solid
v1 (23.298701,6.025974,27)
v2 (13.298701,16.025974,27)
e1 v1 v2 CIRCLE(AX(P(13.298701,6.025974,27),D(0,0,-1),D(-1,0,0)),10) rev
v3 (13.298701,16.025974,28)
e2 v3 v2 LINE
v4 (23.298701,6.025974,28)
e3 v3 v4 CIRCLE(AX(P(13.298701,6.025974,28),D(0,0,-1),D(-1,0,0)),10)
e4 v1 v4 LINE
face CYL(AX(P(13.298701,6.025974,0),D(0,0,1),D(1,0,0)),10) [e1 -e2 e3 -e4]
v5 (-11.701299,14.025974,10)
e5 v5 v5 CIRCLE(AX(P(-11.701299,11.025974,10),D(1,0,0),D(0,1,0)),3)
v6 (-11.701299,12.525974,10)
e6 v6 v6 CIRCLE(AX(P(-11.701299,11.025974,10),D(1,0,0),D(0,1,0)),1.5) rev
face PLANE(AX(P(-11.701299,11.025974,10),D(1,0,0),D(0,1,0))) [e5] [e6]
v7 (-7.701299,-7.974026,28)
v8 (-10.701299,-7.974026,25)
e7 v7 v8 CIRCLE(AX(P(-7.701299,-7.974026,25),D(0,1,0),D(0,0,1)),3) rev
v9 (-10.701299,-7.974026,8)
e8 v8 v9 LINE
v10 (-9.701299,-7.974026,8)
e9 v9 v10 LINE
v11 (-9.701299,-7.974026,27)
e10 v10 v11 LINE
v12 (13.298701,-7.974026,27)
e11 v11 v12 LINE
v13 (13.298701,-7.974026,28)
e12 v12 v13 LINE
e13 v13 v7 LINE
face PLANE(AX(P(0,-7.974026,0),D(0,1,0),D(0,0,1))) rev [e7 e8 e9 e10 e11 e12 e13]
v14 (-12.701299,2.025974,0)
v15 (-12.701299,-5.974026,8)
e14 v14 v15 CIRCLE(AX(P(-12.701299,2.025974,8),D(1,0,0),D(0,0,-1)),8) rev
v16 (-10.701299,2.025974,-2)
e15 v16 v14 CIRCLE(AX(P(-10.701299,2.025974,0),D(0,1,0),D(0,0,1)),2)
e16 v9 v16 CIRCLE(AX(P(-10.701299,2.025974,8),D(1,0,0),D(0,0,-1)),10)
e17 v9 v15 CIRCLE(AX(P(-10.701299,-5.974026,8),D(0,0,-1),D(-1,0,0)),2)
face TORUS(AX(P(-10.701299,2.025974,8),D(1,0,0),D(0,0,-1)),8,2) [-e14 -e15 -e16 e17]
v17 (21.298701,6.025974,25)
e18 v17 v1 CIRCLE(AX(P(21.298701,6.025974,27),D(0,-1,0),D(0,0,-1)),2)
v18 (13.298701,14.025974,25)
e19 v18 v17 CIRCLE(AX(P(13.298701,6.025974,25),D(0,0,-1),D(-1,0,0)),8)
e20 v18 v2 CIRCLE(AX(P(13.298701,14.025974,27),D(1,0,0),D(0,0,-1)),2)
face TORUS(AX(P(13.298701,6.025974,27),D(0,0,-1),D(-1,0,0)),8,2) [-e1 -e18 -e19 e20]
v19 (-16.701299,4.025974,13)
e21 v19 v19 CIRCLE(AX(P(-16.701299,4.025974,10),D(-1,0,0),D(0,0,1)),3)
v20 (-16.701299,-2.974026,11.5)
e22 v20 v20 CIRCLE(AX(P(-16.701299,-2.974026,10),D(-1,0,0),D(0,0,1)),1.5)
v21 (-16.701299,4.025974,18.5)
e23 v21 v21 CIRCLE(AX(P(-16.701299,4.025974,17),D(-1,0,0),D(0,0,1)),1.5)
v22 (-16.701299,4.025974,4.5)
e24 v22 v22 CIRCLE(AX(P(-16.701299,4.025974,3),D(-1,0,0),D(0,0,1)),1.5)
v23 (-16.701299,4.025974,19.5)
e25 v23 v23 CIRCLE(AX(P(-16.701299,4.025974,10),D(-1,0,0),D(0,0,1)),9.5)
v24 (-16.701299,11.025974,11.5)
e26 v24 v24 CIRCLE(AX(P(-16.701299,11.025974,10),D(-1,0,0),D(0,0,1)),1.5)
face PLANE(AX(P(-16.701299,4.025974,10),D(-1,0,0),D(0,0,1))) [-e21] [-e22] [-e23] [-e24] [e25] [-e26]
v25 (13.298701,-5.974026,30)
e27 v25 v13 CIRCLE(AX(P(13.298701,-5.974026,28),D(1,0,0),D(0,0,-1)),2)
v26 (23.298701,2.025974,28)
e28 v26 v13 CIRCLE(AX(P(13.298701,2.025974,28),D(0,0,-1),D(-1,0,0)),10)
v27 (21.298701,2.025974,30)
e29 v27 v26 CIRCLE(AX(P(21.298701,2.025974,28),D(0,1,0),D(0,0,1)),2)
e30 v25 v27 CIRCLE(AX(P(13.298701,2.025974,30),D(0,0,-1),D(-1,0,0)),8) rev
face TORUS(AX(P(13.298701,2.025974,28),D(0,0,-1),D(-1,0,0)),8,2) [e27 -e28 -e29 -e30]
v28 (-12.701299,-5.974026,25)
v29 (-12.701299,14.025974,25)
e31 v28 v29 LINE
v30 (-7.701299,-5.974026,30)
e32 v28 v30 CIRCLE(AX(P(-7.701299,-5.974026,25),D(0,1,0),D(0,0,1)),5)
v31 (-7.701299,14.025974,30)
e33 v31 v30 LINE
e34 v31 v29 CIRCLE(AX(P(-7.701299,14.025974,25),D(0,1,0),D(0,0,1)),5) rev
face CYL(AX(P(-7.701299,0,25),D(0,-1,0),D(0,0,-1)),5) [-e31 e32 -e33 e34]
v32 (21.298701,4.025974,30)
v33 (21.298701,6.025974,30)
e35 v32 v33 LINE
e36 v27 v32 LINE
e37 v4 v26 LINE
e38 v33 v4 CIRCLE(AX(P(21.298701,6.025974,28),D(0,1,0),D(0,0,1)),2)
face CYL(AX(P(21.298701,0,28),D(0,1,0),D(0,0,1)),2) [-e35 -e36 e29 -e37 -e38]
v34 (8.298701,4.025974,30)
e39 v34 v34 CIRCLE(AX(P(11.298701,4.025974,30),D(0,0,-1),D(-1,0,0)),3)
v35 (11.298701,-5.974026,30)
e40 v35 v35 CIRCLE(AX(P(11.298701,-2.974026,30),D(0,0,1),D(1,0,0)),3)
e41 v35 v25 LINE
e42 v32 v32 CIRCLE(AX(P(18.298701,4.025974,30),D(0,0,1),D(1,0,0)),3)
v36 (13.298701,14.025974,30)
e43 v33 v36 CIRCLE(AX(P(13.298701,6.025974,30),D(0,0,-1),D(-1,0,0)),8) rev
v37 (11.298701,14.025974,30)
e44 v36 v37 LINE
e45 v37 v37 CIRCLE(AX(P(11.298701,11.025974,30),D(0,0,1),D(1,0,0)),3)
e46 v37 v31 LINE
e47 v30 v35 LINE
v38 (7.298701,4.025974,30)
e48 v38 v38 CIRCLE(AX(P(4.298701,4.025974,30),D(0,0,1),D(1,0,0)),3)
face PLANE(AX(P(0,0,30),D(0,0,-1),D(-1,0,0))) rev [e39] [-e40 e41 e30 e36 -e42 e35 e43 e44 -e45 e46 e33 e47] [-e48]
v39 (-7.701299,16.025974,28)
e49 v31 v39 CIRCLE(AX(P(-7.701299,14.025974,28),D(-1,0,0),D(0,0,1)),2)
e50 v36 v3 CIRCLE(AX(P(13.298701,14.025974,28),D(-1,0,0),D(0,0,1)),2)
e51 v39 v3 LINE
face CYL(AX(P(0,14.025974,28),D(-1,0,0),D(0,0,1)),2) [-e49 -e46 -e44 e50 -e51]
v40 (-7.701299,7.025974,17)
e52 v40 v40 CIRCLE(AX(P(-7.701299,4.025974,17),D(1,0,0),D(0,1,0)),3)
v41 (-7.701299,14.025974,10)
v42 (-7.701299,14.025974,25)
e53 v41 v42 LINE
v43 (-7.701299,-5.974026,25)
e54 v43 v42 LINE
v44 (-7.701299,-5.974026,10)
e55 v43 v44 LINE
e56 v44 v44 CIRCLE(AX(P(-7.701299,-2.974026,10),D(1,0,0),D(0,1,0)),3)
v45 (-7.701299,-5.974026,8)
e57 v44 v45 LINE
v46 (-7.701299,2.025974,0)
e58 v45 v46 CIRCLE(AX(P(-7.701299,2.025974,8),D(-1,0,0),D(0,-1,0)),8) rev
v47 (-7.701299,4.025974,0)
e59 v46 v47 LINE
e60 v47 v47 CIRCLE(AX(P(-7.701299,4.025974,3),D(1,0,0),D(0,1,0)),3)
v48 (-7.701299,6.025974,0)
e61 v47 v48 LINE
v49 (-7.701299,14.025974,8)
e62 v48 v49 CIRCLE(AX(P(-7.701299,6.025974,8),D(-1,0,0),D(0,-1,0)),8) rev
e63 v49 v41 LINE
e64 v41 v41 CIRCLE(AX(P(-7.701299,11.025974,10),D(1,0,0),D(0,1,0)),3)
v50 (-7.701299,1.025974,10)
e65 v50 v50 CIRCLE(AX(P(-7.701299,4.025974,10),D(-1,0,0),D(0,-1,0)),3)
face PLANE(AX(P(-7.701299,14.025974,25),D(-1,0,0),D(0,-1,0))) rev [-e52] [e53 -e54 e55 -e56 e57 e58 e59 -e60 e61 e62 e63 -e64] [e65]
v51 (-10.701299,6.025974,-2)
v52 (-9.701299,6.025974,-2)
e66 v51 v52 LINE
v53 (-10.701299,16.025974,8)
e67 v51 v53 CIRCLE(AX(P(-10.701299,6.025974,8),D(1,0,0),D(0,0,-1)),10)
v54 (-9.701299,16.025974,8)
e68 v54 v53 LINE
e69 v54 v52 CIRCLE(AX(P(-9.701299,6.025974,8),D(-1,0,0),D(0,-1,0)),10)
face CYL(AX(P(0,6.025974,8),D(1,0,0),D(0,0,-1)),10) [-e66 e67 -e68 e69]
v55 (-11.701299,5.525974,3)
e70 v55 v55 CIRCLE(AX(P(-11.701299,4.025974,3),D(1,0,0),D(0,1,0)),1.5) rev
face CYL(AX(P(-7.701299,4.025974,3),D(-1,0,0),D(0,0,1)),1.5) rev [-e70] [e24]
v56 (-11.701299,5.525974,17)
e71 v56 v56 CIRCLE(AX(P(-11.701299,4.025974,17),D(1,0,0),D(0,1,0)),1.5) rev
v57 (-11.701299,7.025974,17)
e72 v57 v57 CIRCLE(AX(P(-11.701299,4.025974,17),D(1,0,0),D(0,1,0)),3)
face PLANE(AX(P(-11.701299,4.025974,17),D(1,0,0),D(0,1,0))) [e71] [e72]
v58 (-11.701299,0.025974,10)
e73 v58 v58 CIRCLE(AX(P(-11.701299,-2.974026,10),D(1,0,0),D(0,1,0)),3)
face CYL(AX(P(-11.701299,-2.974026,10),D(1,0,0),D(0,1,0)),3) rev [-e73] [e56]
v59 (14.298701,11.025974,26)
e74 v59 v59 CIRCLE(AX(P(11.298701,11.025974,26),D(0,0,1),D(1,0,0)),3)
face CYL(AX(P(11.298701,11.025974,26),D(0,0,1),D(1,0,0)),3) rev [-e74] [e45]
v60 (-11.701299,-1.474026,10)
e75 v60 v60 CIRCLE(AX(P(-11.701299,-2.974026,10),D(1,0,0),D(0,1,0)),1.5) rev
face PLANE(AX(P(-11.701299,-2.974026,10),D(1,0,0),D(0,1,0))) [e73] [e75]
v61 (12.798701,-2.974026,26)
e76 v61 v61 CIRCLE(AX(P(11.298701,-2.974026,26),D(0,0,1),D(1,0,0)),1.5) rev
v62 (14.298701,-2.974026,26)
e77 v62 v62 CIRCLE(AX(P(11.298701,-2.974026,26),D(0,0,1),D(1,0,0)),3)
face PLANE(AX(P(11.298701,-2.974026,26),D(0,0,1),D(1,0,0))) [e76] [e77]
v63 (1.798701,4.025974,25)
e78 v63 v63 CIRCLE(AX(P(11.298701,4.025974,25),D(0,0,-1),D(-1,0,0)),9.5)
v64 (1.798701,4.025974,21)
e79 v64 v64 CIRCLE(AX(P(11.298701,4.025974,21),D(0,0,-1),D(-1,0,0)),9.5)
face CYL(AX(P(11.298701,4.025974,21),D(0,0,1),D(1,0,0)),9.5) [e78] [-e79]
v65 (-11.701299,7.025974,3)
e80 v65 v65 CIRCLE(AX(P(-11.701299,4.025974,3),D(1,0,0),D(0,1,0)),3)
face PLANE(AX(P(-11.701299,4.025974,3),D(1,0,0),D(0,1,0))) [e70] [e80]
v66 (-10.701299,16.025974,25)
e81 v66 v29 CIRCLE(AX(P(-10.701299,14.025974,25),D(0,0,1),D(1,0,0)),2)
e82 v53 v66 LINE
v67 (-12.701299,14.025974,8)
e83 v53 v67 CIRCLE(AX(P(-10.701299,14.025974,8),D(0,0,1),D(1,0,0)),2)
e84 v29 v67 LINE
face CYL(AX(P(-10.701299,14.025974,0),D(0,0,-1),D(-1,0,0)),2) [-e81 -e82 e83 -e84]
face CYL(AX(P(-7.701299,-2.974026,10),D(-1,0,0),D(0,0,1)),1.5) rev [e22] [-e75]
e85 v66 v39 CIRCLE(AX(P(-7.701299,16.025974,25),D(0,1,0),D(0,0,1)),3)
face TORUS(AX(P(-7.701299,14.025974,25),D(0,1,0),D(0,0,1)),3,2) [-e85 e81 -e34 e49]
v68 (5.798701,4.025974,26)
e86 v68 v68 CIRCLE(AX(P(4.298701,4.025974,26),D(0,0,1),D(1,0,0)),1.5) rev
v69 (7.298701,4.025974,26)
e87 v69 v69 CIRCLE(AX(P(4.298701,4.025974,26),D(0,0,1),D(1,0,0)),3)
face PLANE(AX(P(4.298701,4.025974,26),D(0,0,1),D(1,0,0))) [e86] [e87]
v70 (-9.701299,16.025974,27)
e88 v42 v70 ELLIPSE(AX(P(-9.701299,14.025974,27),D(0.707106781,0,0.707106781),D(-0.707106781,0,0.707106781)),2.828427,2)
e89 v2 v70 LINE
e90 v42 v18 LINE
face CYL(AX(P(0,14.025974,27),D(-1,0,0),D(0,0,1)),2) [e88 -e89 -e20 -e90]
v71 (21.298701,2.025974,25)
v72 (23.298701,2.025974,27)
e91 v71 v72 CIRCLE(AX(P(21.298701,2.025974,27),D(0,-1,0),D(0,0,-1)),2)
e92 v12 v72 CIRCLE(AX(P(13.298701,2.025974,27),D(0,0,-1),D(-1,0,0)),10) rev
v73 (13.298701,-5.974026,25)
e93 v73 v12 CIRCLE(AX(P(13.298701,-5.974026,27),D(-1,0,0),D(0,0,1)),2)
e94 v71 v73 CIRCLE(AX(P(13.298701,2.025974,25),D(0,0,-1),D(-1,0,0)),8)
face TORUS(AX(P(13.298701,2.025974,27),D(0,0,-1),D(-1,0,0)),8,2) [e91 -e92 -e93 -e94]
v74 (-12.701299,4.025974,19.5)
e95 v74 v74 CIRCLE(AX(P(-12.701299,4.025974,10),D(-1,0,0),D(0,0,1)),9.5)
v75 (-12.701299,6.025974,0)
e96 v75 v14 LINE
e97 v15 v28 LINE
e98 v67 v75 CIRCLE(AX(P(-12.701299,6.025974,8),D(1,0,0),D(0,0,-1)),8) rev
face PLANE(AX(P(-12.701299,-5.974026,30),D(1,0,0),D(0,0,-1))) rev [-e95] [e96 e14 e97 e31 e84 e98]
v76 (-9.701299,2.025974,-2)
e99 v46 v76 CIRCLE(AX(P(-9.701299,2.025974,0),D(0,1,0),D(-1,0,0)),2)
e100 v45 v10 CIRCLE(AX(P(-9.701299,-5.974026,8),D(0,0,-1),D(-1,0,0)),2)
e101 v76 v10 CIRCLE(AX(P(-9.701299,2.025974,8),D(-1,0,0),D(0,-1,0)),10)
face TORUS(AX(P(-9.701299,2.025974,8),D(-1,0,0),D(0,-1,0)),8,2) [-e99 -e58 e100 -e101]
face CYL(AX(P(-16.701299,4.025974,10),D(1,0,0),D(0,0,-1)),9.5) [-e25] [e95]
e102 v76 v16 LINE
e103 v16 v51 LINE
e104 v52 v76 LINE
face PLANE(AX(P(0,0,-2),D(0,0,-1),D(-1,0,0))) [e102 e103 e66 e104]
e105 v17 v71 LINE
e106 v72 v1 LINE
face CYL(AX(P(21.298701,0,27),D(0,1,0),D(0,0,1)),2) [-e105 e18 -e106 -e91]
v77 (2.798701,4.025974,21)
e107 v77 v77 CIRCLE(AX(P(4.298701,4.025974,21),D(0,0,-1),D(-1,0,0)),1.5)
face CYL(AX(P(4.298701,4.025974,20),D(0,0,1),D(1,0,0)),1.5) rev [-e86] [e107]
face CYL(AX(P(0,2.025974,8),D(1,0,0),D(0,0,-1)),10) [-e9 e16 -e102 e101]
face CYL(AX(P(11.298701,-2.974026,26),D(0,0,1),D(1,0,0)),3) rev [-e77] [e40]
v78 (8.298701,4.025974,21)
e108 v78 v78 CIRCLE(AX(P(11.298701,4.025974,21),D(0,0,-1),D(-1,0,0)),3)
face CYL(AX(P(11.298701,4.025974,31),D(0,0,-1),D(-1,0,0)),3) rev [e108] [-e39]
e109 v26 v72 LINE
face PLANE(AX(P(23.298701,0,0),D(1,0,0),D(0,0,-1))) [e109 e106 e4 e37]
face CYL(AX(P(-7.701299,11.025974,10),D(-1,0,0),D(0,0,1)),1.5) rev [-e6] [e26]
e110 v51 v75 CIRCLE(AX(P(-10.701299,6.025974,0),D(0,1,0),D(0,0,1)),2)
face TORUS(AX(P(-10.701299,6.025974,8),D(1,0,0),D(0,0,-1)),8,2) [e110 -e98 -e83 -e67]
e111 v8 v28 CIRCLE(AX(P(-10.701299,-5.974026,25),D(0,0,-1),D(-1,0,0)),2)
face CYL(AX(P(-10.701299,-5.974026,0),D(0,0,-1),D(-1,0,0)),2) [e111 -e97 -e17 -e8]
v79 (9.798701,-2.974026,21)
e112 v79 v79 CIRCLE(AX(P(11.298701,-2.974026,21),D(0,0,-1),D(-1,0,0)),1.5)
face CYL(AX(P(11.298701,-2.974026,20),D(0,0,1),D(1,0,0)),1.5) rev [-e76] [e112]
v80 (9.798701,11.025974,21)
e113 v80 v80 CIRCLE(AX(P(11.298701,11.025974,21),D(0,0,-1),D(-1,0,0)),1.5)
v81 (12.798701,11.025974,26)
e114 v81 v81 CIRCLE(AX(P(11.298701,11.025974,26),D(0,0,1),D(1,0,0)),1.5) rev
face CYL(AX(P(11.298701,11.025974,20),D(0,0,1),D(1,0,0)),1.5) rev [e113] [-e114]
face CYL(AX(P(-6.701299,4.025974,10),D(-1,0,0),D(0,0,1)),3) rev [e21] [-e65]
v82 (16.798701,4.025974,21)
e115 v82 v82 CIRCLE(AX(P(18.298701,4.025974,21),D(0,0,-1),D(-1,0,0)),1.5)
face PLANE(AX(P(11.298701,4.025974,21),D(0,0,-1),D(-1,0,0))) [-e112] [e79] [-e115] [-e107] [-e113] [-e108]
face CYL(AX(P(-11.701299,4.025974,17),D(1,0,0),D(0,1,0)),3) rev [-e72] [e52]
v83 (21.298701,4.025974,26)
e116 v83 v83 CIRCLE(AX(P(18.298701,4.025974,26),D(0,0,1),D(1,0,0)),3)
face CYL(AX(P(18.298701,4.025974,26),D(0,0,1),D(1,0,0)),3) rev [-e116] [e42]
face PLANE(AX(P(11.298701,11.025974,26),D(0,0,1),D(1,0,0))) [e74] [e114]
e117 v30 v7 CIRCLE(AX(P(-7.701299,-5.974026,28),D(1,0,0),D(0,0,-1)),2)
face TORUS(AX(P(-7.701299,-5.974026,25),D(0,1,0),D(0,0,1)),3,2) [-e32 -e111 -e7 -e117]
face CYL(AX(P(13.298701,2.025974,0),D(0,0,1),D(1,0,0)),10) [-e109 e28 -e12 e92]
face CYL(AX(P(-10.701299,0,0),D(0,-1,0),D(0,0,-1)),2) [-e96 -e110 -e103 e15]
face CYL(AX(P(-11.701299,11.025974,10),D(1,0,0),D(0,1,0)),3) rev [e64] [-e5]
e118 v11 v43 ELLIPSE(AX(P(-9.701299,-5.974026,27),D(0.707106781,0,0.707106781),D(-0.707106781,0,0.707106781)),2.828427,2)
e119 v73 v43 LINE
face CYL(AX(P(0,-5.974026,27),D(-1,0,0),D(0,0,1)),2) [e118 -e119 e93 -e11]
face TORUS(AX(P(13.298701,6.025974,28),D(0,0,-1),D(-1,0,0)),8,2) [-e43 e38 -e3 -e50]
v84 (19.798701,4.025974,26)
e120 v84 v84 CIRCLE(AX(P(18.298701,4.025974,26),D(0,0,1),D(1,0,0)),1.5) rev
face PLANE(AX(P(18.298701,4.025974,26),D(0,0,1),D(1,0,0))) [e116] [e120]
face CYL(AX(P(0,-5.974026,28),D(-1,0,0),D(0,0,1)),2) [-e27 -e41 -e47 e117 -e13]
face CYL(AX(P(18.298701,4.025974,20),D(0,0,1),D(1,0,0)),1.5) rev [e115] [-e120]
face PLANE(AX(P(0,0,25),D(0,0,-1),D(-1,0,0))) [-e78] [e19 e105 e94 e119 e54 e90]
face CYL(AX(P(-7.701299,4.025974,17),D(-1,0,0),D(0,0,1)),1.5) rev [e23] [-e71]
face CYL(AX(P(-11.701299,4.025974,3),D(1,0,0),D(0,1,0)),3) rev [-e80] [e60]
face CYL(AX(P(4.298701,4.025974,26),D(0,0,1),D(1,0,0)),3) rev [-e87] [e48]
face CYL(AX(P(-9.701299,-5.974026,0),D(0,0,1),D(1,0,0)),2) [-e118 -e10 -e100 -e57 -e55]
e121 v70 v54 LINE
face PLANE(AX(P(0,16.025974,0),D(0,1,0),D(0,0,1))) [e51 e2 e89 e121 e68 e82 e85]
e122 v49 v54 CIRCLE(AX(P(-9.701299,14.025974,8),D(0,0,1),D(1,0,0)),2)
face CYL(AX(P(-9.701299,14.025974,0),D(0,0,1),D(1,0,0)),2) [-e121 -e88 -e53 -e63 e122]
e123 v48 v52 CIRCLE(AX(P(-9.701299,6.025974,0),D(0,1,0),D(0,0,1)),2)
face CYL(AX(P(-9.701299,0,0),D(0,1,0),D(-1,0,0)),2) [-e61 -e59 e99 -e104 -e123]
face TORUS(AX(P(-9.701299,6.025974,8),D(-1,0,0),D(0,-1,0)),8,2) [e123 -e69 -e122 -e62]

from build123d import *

# Parameters (mm, degrees)
SKETCH_1_W           = 34
SKETCH_1_H           = 20
EXTRUDE_1_DEPTH      = 30
SKETCH_2_W           = 29
SKETCH_2_H           = 20
CUT_EXTRUDE_1_DEPTH  = 25
SKETCH_7_R           = 9.5
EXTRUDE_3_DEPTH      = 4
SKETCH_4_R           = 1.5
CUT_EXTRUDE_5_DEPTH  = 5
SKETCH_6_R           = 9.5
EXTRUDE_2_DEPTH      = 4
SKETCH_5_R           = 1.5
CUT_EXTRUDE_6_DEPTH  = 10
SKETCH_9_R           = 3
CUT_EXTRUDE_7_DEPTH  = 10
SKETCH_10_R          = 3
CUT_EXTRUDE_8_DEPTH  = 10
EXTRUDE_4_DEPTH      = 2
EXTRUDE_5_DEPTH      = 2
SKETCH_14_W          = 5
SKETCH_14_H          = 24
EXTRUDE_6_DEPTH      = 2
SKETCH_15_W          = 5
SKETCH_15_H          = 24
EXTRUDE_7_DEPTH      = 2
SKETCH_16_R          = 3
CUT_EXTRUDE_10_DEPTH = 4
SKETCH_17_R          = 3
CUT_EXTRUDE_11_DEPTH = 4
FILLET_5_R           = 10
FILLET_6_R           = 10
FILLET_9_R           = 10
FILLET_10_R          = 10
FILLET_11_R          = 5
FILLET_12_R          = 2
FILLET_13_R          = 2
FILLET_14_R          = 2


with BuildPart() as part:
    # 草图1 → 凸台-拉伸1 (new body)
    with BuildSketch(Plane.XY):
        with Locations((4.298701299, 4.025974026)):
            Rectangle(SKETCH_1_W, SKETCH_1_H)
    extrude(amount=EXTRUDE_1_DEPTH)

    # 草图2 → 切除-拉伸1 (cut)
    with BuildSketch(Plane(origin=(0, 0, 0), x_dir=(-1, 0, 0), z_dir=(0, 0, -1))):
        with Locations((-6.798701299, 4.025974026)):
            Rectangle(SKETCH_2_W, SKETCH_2_H)
    extrude(amount=-CUT_EXTRUDE_1_DEPTH, mode=Mode.SUBTRACT)

    # 草图7 → 凸台-拉伸3 (add)
    with BuildSketch(Plane.ZY.offset(12.701298701)):
        with Locations((10, 4.025974026)):
            Circle(SKETCH_7_R)
    extrude(amount=EXTRUDE_3_DEPTH)

    # 草图4 → 切除-拉伸5 (cut, symmetric)
    with BuildSketch(Plane.ZY.offset(12.701298701)):
        with Locations((10, 11.025974026)):
            Circle(SKETCH_4_R)
        with Locations((3, 4.025974026)):
            Circle(SKETCH_4_R)
        with Locations((10, -2.974025974)):
            Circle(SKETCH_4_R)
        with Locations((17, 4.025974026)):
            Circle(SKETCH_4_R)
    extrude(amount=CUT_EXTRUDE_5_DEPTH, both=True, mode=Mode.SUBTRACT)

    # 草图6 → 凸台-拉伸2 (add)
    with BuildSketch(Plane(origin=(0, 0, 25), x_dir=(-1, 0, 0), z_dir=(0, 0, -1))):
        with Locations((-11.298701299, 4.025974026)):
            Circle(SKETCH_6_R)
    extrude(amount=EXTRUDE_2_DEPTH)

    # 草图5 → 切除-拉伸6 (cut)
    with BuildSketch(Plane.XY.offset(30)):
        with Locations((11.298701299, 11.025974026)):
            Circle(SKETCH_5_R)
        with Locations((11.298701299, -2.974025974)):
            Circle(SKETCH_5_R)
        with Locations((4.298701299, 4.025974026)):
            Circle(SKETCH_5_R)
        with Locations((18.298701299, 4.025974026)):
            Circle(SKETCH_5_R)
    extrude(amount=-CUT_EXTRUDE_6_DEPTH, mode=Mode.SUBTRACT)

    # 草图9 → 切除-拉伸7 (cut)
    with BuildSketch(Plane(origin=(0, 0, 21), x_dir=(-1, 0, 0), z_dir=(0, 0, -1))):
        with Locations((-11.298701299, 4.025974026)):
            Circle(SKETCH_9_R)
    extrude(amount=-CUT_EXTRUDE_7_DEPTH, mode=Mode.SUBTRACT)

    # 草图10 → 切除-拉伸8 (cut)
    with BuildSketch(Plane.ZY.offset(16.701298701)):
        with Locations((10, 4.025974026)):
            Circle(SKETCH_10_R)
    extrude(amount=-CUT_EXTRUDE_8_DEPTH, mode=Mode.SUBTRACT)

    # 草图12 → 凸台-拉伸4 (add)
    with BuildSketch(Plane(origin=(0, 14.025974026, 0), x_dir=(1, 0, 0), z_dir=(0, 1, 0))):
        Polygon((21.298701299, -25), (-7.701298701, -25), (-7.701298701, 0), (-12.701298701, 0), (-12.701298701, -30), (21.298701299, -30), align=None)
    extrude(amount=EXTRUDE_4_DEPTH)

    # 草图13 → 凸台-拉伸5 (add)
    with BuildSketch(Plane.XZ.offset(5.974025974)):
        Polygon((-7.701298701, 25), (21.298701299, 25), (21.298701299, 30), (-12.701298701, 30), (-12.701298701, 0), (-7.701298701, 0), align=None)
    extrude(amount=EXTRUDE_5_DEPTH)

    # 草图14 → 凸台-拉伸6 (add)
    with BuildSketch(Plane(origin=(21.298701299, 0, 0), x_dir=(0, 0, -1), z_dir=(1, 0, 0))):
        with Locations((-27.5, 4.025974026)):
            Rectangle(SKETCH_14_W, SKETCH_14_H)
    extrude(amount=EXTRUDE_6_DEPTH)

    # 草图15 → 凸台-拉伸7 (add)
    with BuildSketch(Plane(origin=(0, 0, 0), x_dir=(-1, 0, 0), z_dir=(0, 0, -1))):
        with Locations((10.201298701, 4.025974026)):
            Rectangle(SKETCH_15_W, SKETCH_15_H)
    extrude(amount=EXTRUDE_7_DEPTH)

    # 草图16 → 切除-拉伸10 (cut)
    with BuildSketch(Plane.XY.offset(30)):
        with Locations((11.298701299, 11.025974026)):
            Circle(SKETCH_16_R)
        with Locations((4.298701299, 4.025974026)):
            Circle(SKETCH_16_R)
        with Locations((11.298701299, -2.974025974)):
            Circle(SKETCH_16_R)
        with Locations((18.298701299, 4.025974026)):
            Circle(SKETCH_16_R)
    extrude(amount=-CUT_EXTRUDE_10_DEPTH, mode=Mode.SUBTRACT)

    # 草图17 → 切除-拉伸11 (cut)
    with BuildSketch(Plane(origin=(-7.701298701, 0, 0), x_dir=(0, 0, -1), z_dir=(1, 0, 0))):
        with Locations(Location((-10, 11.025974026, 0), (0, 0, 90))):
            Circle(SKETCH_17_R)
        with Locations(Location((-17, 4.025974026, 0), (0, 0, 90))):
            Circle(SKETCH_17_R)
        with Locations(Location((-10, -2.974025974, 0), (0, 0, 90))):
            Circle(SKETCH_17_R)
        with Locations(Location((-3, 4.025974026, 0), (0, 0, 90))):
            Circle(SKETCH_17_R)
    extrude(amount=-CUT_EXTRUDE_11_DEPTH, mode=Mode.SUBTRACT)

    # 圆角5
    fillet_5_edges = [part.edges().sort_by_distance(p)[0] for p in [
        (-10.201298701, 16.025974026, -2),
    ]]
    fillet(fillet_5_edges, radius=FILLET_5_R)

    # 圆角6
    fillet_6_edges = [part.edges().sort_by_distance(p)[0] for p in [
        (-10.201298701, -7.974025974, -2),
    ]]
    fillet(fillet_6_edges, radius=FILLET_6_R)

    # 圆角9
    fillet_9_edges = [part.edges().sort_by_distance(p)[0] for p in [
        (23.298701299, -7.974025974, 27.5),
    ]]
    fillet(fillet_9_edges, radius=FILLET_9_R)

    # 圆角10
    fillet_10_edges = [part.edges().sort_by_distance(p)[0] for p in [
        (23.298701299, 16.025974026, 27.5),
    ]]
    fillet(fillet_10_edges, radius=FILLET_10_R)

    # 圆角11
    fillet_11_edges = [part.edges().sort_by_distance(p)[0] for p in [
        (-12.701298701, 4.025974026, 30),
    ]]
    fillet(fillet_11_edges, radius=FILLET_11_R)

    # 圆角12
    fillet_12_edges = [part.edges().sort_by_distance(p)[0] for p in [
        (-12.701298701, 16.025974026, 16.5),
        (-12.701298701, 13.097041838, 0.928932188),
        (-12.701298701, 4.025974026, -2),
        (-12.701298701, -5.045093786, 0.928932188),
        (2.798701299, -7.974025974, 30),
        (20.369769111, -5.045093786, 30),
        (23.298701299, 4.025974026, 30),
        (20.369769111, 13.097041838, 30),
        (2.798701299, 16.025974026, 30),
        (-12.701298701, -7.974025974, 16.5),
        (-11.236832607, -7.974025974, 28.535533906),
        (-11.236832607, 16.025974026, 28.535533906),
    ]]
    fillet(fillet_12_edges, radius=FILLET_12_R - 0.0001)  # a hair under: the kernel refuses the full size

    # 圆角13
    fillet_13_edges = [part.edges().sort_by_distance(p)[0] for p in [
        (2.798701299, -7.974025974, 25),
        (23.298701299, 4.025974026, 25),
        (20.369769111, -5.045093786, 25),
        (2.798701299, 16.025974026, 25),
        (20.369769111, 13.097041838, 25),
    ]]
    fillet(fillet_13_edges, radius=FILLET_13_R)

    # 圆角14
    fillet_14_edges = [part.edges().sort_by_distance(p)[0] for p in [
        (-7.701298701, 16.025974026, 17.5),
        (-7.701298701, 13.097041838, 0.928932188),
        (-7.701298701, 4.025974026, -2),
        (-7.701298701, -5.045093786, 0.928932188),
        (-7.701298701, -7.974025974, 17.5),
    ]]
    fillet(fillet_14_edges, radius=FILLET_14_R - 0.0001)  # a hair under: the kernel refuses the full size


solid = part.part
